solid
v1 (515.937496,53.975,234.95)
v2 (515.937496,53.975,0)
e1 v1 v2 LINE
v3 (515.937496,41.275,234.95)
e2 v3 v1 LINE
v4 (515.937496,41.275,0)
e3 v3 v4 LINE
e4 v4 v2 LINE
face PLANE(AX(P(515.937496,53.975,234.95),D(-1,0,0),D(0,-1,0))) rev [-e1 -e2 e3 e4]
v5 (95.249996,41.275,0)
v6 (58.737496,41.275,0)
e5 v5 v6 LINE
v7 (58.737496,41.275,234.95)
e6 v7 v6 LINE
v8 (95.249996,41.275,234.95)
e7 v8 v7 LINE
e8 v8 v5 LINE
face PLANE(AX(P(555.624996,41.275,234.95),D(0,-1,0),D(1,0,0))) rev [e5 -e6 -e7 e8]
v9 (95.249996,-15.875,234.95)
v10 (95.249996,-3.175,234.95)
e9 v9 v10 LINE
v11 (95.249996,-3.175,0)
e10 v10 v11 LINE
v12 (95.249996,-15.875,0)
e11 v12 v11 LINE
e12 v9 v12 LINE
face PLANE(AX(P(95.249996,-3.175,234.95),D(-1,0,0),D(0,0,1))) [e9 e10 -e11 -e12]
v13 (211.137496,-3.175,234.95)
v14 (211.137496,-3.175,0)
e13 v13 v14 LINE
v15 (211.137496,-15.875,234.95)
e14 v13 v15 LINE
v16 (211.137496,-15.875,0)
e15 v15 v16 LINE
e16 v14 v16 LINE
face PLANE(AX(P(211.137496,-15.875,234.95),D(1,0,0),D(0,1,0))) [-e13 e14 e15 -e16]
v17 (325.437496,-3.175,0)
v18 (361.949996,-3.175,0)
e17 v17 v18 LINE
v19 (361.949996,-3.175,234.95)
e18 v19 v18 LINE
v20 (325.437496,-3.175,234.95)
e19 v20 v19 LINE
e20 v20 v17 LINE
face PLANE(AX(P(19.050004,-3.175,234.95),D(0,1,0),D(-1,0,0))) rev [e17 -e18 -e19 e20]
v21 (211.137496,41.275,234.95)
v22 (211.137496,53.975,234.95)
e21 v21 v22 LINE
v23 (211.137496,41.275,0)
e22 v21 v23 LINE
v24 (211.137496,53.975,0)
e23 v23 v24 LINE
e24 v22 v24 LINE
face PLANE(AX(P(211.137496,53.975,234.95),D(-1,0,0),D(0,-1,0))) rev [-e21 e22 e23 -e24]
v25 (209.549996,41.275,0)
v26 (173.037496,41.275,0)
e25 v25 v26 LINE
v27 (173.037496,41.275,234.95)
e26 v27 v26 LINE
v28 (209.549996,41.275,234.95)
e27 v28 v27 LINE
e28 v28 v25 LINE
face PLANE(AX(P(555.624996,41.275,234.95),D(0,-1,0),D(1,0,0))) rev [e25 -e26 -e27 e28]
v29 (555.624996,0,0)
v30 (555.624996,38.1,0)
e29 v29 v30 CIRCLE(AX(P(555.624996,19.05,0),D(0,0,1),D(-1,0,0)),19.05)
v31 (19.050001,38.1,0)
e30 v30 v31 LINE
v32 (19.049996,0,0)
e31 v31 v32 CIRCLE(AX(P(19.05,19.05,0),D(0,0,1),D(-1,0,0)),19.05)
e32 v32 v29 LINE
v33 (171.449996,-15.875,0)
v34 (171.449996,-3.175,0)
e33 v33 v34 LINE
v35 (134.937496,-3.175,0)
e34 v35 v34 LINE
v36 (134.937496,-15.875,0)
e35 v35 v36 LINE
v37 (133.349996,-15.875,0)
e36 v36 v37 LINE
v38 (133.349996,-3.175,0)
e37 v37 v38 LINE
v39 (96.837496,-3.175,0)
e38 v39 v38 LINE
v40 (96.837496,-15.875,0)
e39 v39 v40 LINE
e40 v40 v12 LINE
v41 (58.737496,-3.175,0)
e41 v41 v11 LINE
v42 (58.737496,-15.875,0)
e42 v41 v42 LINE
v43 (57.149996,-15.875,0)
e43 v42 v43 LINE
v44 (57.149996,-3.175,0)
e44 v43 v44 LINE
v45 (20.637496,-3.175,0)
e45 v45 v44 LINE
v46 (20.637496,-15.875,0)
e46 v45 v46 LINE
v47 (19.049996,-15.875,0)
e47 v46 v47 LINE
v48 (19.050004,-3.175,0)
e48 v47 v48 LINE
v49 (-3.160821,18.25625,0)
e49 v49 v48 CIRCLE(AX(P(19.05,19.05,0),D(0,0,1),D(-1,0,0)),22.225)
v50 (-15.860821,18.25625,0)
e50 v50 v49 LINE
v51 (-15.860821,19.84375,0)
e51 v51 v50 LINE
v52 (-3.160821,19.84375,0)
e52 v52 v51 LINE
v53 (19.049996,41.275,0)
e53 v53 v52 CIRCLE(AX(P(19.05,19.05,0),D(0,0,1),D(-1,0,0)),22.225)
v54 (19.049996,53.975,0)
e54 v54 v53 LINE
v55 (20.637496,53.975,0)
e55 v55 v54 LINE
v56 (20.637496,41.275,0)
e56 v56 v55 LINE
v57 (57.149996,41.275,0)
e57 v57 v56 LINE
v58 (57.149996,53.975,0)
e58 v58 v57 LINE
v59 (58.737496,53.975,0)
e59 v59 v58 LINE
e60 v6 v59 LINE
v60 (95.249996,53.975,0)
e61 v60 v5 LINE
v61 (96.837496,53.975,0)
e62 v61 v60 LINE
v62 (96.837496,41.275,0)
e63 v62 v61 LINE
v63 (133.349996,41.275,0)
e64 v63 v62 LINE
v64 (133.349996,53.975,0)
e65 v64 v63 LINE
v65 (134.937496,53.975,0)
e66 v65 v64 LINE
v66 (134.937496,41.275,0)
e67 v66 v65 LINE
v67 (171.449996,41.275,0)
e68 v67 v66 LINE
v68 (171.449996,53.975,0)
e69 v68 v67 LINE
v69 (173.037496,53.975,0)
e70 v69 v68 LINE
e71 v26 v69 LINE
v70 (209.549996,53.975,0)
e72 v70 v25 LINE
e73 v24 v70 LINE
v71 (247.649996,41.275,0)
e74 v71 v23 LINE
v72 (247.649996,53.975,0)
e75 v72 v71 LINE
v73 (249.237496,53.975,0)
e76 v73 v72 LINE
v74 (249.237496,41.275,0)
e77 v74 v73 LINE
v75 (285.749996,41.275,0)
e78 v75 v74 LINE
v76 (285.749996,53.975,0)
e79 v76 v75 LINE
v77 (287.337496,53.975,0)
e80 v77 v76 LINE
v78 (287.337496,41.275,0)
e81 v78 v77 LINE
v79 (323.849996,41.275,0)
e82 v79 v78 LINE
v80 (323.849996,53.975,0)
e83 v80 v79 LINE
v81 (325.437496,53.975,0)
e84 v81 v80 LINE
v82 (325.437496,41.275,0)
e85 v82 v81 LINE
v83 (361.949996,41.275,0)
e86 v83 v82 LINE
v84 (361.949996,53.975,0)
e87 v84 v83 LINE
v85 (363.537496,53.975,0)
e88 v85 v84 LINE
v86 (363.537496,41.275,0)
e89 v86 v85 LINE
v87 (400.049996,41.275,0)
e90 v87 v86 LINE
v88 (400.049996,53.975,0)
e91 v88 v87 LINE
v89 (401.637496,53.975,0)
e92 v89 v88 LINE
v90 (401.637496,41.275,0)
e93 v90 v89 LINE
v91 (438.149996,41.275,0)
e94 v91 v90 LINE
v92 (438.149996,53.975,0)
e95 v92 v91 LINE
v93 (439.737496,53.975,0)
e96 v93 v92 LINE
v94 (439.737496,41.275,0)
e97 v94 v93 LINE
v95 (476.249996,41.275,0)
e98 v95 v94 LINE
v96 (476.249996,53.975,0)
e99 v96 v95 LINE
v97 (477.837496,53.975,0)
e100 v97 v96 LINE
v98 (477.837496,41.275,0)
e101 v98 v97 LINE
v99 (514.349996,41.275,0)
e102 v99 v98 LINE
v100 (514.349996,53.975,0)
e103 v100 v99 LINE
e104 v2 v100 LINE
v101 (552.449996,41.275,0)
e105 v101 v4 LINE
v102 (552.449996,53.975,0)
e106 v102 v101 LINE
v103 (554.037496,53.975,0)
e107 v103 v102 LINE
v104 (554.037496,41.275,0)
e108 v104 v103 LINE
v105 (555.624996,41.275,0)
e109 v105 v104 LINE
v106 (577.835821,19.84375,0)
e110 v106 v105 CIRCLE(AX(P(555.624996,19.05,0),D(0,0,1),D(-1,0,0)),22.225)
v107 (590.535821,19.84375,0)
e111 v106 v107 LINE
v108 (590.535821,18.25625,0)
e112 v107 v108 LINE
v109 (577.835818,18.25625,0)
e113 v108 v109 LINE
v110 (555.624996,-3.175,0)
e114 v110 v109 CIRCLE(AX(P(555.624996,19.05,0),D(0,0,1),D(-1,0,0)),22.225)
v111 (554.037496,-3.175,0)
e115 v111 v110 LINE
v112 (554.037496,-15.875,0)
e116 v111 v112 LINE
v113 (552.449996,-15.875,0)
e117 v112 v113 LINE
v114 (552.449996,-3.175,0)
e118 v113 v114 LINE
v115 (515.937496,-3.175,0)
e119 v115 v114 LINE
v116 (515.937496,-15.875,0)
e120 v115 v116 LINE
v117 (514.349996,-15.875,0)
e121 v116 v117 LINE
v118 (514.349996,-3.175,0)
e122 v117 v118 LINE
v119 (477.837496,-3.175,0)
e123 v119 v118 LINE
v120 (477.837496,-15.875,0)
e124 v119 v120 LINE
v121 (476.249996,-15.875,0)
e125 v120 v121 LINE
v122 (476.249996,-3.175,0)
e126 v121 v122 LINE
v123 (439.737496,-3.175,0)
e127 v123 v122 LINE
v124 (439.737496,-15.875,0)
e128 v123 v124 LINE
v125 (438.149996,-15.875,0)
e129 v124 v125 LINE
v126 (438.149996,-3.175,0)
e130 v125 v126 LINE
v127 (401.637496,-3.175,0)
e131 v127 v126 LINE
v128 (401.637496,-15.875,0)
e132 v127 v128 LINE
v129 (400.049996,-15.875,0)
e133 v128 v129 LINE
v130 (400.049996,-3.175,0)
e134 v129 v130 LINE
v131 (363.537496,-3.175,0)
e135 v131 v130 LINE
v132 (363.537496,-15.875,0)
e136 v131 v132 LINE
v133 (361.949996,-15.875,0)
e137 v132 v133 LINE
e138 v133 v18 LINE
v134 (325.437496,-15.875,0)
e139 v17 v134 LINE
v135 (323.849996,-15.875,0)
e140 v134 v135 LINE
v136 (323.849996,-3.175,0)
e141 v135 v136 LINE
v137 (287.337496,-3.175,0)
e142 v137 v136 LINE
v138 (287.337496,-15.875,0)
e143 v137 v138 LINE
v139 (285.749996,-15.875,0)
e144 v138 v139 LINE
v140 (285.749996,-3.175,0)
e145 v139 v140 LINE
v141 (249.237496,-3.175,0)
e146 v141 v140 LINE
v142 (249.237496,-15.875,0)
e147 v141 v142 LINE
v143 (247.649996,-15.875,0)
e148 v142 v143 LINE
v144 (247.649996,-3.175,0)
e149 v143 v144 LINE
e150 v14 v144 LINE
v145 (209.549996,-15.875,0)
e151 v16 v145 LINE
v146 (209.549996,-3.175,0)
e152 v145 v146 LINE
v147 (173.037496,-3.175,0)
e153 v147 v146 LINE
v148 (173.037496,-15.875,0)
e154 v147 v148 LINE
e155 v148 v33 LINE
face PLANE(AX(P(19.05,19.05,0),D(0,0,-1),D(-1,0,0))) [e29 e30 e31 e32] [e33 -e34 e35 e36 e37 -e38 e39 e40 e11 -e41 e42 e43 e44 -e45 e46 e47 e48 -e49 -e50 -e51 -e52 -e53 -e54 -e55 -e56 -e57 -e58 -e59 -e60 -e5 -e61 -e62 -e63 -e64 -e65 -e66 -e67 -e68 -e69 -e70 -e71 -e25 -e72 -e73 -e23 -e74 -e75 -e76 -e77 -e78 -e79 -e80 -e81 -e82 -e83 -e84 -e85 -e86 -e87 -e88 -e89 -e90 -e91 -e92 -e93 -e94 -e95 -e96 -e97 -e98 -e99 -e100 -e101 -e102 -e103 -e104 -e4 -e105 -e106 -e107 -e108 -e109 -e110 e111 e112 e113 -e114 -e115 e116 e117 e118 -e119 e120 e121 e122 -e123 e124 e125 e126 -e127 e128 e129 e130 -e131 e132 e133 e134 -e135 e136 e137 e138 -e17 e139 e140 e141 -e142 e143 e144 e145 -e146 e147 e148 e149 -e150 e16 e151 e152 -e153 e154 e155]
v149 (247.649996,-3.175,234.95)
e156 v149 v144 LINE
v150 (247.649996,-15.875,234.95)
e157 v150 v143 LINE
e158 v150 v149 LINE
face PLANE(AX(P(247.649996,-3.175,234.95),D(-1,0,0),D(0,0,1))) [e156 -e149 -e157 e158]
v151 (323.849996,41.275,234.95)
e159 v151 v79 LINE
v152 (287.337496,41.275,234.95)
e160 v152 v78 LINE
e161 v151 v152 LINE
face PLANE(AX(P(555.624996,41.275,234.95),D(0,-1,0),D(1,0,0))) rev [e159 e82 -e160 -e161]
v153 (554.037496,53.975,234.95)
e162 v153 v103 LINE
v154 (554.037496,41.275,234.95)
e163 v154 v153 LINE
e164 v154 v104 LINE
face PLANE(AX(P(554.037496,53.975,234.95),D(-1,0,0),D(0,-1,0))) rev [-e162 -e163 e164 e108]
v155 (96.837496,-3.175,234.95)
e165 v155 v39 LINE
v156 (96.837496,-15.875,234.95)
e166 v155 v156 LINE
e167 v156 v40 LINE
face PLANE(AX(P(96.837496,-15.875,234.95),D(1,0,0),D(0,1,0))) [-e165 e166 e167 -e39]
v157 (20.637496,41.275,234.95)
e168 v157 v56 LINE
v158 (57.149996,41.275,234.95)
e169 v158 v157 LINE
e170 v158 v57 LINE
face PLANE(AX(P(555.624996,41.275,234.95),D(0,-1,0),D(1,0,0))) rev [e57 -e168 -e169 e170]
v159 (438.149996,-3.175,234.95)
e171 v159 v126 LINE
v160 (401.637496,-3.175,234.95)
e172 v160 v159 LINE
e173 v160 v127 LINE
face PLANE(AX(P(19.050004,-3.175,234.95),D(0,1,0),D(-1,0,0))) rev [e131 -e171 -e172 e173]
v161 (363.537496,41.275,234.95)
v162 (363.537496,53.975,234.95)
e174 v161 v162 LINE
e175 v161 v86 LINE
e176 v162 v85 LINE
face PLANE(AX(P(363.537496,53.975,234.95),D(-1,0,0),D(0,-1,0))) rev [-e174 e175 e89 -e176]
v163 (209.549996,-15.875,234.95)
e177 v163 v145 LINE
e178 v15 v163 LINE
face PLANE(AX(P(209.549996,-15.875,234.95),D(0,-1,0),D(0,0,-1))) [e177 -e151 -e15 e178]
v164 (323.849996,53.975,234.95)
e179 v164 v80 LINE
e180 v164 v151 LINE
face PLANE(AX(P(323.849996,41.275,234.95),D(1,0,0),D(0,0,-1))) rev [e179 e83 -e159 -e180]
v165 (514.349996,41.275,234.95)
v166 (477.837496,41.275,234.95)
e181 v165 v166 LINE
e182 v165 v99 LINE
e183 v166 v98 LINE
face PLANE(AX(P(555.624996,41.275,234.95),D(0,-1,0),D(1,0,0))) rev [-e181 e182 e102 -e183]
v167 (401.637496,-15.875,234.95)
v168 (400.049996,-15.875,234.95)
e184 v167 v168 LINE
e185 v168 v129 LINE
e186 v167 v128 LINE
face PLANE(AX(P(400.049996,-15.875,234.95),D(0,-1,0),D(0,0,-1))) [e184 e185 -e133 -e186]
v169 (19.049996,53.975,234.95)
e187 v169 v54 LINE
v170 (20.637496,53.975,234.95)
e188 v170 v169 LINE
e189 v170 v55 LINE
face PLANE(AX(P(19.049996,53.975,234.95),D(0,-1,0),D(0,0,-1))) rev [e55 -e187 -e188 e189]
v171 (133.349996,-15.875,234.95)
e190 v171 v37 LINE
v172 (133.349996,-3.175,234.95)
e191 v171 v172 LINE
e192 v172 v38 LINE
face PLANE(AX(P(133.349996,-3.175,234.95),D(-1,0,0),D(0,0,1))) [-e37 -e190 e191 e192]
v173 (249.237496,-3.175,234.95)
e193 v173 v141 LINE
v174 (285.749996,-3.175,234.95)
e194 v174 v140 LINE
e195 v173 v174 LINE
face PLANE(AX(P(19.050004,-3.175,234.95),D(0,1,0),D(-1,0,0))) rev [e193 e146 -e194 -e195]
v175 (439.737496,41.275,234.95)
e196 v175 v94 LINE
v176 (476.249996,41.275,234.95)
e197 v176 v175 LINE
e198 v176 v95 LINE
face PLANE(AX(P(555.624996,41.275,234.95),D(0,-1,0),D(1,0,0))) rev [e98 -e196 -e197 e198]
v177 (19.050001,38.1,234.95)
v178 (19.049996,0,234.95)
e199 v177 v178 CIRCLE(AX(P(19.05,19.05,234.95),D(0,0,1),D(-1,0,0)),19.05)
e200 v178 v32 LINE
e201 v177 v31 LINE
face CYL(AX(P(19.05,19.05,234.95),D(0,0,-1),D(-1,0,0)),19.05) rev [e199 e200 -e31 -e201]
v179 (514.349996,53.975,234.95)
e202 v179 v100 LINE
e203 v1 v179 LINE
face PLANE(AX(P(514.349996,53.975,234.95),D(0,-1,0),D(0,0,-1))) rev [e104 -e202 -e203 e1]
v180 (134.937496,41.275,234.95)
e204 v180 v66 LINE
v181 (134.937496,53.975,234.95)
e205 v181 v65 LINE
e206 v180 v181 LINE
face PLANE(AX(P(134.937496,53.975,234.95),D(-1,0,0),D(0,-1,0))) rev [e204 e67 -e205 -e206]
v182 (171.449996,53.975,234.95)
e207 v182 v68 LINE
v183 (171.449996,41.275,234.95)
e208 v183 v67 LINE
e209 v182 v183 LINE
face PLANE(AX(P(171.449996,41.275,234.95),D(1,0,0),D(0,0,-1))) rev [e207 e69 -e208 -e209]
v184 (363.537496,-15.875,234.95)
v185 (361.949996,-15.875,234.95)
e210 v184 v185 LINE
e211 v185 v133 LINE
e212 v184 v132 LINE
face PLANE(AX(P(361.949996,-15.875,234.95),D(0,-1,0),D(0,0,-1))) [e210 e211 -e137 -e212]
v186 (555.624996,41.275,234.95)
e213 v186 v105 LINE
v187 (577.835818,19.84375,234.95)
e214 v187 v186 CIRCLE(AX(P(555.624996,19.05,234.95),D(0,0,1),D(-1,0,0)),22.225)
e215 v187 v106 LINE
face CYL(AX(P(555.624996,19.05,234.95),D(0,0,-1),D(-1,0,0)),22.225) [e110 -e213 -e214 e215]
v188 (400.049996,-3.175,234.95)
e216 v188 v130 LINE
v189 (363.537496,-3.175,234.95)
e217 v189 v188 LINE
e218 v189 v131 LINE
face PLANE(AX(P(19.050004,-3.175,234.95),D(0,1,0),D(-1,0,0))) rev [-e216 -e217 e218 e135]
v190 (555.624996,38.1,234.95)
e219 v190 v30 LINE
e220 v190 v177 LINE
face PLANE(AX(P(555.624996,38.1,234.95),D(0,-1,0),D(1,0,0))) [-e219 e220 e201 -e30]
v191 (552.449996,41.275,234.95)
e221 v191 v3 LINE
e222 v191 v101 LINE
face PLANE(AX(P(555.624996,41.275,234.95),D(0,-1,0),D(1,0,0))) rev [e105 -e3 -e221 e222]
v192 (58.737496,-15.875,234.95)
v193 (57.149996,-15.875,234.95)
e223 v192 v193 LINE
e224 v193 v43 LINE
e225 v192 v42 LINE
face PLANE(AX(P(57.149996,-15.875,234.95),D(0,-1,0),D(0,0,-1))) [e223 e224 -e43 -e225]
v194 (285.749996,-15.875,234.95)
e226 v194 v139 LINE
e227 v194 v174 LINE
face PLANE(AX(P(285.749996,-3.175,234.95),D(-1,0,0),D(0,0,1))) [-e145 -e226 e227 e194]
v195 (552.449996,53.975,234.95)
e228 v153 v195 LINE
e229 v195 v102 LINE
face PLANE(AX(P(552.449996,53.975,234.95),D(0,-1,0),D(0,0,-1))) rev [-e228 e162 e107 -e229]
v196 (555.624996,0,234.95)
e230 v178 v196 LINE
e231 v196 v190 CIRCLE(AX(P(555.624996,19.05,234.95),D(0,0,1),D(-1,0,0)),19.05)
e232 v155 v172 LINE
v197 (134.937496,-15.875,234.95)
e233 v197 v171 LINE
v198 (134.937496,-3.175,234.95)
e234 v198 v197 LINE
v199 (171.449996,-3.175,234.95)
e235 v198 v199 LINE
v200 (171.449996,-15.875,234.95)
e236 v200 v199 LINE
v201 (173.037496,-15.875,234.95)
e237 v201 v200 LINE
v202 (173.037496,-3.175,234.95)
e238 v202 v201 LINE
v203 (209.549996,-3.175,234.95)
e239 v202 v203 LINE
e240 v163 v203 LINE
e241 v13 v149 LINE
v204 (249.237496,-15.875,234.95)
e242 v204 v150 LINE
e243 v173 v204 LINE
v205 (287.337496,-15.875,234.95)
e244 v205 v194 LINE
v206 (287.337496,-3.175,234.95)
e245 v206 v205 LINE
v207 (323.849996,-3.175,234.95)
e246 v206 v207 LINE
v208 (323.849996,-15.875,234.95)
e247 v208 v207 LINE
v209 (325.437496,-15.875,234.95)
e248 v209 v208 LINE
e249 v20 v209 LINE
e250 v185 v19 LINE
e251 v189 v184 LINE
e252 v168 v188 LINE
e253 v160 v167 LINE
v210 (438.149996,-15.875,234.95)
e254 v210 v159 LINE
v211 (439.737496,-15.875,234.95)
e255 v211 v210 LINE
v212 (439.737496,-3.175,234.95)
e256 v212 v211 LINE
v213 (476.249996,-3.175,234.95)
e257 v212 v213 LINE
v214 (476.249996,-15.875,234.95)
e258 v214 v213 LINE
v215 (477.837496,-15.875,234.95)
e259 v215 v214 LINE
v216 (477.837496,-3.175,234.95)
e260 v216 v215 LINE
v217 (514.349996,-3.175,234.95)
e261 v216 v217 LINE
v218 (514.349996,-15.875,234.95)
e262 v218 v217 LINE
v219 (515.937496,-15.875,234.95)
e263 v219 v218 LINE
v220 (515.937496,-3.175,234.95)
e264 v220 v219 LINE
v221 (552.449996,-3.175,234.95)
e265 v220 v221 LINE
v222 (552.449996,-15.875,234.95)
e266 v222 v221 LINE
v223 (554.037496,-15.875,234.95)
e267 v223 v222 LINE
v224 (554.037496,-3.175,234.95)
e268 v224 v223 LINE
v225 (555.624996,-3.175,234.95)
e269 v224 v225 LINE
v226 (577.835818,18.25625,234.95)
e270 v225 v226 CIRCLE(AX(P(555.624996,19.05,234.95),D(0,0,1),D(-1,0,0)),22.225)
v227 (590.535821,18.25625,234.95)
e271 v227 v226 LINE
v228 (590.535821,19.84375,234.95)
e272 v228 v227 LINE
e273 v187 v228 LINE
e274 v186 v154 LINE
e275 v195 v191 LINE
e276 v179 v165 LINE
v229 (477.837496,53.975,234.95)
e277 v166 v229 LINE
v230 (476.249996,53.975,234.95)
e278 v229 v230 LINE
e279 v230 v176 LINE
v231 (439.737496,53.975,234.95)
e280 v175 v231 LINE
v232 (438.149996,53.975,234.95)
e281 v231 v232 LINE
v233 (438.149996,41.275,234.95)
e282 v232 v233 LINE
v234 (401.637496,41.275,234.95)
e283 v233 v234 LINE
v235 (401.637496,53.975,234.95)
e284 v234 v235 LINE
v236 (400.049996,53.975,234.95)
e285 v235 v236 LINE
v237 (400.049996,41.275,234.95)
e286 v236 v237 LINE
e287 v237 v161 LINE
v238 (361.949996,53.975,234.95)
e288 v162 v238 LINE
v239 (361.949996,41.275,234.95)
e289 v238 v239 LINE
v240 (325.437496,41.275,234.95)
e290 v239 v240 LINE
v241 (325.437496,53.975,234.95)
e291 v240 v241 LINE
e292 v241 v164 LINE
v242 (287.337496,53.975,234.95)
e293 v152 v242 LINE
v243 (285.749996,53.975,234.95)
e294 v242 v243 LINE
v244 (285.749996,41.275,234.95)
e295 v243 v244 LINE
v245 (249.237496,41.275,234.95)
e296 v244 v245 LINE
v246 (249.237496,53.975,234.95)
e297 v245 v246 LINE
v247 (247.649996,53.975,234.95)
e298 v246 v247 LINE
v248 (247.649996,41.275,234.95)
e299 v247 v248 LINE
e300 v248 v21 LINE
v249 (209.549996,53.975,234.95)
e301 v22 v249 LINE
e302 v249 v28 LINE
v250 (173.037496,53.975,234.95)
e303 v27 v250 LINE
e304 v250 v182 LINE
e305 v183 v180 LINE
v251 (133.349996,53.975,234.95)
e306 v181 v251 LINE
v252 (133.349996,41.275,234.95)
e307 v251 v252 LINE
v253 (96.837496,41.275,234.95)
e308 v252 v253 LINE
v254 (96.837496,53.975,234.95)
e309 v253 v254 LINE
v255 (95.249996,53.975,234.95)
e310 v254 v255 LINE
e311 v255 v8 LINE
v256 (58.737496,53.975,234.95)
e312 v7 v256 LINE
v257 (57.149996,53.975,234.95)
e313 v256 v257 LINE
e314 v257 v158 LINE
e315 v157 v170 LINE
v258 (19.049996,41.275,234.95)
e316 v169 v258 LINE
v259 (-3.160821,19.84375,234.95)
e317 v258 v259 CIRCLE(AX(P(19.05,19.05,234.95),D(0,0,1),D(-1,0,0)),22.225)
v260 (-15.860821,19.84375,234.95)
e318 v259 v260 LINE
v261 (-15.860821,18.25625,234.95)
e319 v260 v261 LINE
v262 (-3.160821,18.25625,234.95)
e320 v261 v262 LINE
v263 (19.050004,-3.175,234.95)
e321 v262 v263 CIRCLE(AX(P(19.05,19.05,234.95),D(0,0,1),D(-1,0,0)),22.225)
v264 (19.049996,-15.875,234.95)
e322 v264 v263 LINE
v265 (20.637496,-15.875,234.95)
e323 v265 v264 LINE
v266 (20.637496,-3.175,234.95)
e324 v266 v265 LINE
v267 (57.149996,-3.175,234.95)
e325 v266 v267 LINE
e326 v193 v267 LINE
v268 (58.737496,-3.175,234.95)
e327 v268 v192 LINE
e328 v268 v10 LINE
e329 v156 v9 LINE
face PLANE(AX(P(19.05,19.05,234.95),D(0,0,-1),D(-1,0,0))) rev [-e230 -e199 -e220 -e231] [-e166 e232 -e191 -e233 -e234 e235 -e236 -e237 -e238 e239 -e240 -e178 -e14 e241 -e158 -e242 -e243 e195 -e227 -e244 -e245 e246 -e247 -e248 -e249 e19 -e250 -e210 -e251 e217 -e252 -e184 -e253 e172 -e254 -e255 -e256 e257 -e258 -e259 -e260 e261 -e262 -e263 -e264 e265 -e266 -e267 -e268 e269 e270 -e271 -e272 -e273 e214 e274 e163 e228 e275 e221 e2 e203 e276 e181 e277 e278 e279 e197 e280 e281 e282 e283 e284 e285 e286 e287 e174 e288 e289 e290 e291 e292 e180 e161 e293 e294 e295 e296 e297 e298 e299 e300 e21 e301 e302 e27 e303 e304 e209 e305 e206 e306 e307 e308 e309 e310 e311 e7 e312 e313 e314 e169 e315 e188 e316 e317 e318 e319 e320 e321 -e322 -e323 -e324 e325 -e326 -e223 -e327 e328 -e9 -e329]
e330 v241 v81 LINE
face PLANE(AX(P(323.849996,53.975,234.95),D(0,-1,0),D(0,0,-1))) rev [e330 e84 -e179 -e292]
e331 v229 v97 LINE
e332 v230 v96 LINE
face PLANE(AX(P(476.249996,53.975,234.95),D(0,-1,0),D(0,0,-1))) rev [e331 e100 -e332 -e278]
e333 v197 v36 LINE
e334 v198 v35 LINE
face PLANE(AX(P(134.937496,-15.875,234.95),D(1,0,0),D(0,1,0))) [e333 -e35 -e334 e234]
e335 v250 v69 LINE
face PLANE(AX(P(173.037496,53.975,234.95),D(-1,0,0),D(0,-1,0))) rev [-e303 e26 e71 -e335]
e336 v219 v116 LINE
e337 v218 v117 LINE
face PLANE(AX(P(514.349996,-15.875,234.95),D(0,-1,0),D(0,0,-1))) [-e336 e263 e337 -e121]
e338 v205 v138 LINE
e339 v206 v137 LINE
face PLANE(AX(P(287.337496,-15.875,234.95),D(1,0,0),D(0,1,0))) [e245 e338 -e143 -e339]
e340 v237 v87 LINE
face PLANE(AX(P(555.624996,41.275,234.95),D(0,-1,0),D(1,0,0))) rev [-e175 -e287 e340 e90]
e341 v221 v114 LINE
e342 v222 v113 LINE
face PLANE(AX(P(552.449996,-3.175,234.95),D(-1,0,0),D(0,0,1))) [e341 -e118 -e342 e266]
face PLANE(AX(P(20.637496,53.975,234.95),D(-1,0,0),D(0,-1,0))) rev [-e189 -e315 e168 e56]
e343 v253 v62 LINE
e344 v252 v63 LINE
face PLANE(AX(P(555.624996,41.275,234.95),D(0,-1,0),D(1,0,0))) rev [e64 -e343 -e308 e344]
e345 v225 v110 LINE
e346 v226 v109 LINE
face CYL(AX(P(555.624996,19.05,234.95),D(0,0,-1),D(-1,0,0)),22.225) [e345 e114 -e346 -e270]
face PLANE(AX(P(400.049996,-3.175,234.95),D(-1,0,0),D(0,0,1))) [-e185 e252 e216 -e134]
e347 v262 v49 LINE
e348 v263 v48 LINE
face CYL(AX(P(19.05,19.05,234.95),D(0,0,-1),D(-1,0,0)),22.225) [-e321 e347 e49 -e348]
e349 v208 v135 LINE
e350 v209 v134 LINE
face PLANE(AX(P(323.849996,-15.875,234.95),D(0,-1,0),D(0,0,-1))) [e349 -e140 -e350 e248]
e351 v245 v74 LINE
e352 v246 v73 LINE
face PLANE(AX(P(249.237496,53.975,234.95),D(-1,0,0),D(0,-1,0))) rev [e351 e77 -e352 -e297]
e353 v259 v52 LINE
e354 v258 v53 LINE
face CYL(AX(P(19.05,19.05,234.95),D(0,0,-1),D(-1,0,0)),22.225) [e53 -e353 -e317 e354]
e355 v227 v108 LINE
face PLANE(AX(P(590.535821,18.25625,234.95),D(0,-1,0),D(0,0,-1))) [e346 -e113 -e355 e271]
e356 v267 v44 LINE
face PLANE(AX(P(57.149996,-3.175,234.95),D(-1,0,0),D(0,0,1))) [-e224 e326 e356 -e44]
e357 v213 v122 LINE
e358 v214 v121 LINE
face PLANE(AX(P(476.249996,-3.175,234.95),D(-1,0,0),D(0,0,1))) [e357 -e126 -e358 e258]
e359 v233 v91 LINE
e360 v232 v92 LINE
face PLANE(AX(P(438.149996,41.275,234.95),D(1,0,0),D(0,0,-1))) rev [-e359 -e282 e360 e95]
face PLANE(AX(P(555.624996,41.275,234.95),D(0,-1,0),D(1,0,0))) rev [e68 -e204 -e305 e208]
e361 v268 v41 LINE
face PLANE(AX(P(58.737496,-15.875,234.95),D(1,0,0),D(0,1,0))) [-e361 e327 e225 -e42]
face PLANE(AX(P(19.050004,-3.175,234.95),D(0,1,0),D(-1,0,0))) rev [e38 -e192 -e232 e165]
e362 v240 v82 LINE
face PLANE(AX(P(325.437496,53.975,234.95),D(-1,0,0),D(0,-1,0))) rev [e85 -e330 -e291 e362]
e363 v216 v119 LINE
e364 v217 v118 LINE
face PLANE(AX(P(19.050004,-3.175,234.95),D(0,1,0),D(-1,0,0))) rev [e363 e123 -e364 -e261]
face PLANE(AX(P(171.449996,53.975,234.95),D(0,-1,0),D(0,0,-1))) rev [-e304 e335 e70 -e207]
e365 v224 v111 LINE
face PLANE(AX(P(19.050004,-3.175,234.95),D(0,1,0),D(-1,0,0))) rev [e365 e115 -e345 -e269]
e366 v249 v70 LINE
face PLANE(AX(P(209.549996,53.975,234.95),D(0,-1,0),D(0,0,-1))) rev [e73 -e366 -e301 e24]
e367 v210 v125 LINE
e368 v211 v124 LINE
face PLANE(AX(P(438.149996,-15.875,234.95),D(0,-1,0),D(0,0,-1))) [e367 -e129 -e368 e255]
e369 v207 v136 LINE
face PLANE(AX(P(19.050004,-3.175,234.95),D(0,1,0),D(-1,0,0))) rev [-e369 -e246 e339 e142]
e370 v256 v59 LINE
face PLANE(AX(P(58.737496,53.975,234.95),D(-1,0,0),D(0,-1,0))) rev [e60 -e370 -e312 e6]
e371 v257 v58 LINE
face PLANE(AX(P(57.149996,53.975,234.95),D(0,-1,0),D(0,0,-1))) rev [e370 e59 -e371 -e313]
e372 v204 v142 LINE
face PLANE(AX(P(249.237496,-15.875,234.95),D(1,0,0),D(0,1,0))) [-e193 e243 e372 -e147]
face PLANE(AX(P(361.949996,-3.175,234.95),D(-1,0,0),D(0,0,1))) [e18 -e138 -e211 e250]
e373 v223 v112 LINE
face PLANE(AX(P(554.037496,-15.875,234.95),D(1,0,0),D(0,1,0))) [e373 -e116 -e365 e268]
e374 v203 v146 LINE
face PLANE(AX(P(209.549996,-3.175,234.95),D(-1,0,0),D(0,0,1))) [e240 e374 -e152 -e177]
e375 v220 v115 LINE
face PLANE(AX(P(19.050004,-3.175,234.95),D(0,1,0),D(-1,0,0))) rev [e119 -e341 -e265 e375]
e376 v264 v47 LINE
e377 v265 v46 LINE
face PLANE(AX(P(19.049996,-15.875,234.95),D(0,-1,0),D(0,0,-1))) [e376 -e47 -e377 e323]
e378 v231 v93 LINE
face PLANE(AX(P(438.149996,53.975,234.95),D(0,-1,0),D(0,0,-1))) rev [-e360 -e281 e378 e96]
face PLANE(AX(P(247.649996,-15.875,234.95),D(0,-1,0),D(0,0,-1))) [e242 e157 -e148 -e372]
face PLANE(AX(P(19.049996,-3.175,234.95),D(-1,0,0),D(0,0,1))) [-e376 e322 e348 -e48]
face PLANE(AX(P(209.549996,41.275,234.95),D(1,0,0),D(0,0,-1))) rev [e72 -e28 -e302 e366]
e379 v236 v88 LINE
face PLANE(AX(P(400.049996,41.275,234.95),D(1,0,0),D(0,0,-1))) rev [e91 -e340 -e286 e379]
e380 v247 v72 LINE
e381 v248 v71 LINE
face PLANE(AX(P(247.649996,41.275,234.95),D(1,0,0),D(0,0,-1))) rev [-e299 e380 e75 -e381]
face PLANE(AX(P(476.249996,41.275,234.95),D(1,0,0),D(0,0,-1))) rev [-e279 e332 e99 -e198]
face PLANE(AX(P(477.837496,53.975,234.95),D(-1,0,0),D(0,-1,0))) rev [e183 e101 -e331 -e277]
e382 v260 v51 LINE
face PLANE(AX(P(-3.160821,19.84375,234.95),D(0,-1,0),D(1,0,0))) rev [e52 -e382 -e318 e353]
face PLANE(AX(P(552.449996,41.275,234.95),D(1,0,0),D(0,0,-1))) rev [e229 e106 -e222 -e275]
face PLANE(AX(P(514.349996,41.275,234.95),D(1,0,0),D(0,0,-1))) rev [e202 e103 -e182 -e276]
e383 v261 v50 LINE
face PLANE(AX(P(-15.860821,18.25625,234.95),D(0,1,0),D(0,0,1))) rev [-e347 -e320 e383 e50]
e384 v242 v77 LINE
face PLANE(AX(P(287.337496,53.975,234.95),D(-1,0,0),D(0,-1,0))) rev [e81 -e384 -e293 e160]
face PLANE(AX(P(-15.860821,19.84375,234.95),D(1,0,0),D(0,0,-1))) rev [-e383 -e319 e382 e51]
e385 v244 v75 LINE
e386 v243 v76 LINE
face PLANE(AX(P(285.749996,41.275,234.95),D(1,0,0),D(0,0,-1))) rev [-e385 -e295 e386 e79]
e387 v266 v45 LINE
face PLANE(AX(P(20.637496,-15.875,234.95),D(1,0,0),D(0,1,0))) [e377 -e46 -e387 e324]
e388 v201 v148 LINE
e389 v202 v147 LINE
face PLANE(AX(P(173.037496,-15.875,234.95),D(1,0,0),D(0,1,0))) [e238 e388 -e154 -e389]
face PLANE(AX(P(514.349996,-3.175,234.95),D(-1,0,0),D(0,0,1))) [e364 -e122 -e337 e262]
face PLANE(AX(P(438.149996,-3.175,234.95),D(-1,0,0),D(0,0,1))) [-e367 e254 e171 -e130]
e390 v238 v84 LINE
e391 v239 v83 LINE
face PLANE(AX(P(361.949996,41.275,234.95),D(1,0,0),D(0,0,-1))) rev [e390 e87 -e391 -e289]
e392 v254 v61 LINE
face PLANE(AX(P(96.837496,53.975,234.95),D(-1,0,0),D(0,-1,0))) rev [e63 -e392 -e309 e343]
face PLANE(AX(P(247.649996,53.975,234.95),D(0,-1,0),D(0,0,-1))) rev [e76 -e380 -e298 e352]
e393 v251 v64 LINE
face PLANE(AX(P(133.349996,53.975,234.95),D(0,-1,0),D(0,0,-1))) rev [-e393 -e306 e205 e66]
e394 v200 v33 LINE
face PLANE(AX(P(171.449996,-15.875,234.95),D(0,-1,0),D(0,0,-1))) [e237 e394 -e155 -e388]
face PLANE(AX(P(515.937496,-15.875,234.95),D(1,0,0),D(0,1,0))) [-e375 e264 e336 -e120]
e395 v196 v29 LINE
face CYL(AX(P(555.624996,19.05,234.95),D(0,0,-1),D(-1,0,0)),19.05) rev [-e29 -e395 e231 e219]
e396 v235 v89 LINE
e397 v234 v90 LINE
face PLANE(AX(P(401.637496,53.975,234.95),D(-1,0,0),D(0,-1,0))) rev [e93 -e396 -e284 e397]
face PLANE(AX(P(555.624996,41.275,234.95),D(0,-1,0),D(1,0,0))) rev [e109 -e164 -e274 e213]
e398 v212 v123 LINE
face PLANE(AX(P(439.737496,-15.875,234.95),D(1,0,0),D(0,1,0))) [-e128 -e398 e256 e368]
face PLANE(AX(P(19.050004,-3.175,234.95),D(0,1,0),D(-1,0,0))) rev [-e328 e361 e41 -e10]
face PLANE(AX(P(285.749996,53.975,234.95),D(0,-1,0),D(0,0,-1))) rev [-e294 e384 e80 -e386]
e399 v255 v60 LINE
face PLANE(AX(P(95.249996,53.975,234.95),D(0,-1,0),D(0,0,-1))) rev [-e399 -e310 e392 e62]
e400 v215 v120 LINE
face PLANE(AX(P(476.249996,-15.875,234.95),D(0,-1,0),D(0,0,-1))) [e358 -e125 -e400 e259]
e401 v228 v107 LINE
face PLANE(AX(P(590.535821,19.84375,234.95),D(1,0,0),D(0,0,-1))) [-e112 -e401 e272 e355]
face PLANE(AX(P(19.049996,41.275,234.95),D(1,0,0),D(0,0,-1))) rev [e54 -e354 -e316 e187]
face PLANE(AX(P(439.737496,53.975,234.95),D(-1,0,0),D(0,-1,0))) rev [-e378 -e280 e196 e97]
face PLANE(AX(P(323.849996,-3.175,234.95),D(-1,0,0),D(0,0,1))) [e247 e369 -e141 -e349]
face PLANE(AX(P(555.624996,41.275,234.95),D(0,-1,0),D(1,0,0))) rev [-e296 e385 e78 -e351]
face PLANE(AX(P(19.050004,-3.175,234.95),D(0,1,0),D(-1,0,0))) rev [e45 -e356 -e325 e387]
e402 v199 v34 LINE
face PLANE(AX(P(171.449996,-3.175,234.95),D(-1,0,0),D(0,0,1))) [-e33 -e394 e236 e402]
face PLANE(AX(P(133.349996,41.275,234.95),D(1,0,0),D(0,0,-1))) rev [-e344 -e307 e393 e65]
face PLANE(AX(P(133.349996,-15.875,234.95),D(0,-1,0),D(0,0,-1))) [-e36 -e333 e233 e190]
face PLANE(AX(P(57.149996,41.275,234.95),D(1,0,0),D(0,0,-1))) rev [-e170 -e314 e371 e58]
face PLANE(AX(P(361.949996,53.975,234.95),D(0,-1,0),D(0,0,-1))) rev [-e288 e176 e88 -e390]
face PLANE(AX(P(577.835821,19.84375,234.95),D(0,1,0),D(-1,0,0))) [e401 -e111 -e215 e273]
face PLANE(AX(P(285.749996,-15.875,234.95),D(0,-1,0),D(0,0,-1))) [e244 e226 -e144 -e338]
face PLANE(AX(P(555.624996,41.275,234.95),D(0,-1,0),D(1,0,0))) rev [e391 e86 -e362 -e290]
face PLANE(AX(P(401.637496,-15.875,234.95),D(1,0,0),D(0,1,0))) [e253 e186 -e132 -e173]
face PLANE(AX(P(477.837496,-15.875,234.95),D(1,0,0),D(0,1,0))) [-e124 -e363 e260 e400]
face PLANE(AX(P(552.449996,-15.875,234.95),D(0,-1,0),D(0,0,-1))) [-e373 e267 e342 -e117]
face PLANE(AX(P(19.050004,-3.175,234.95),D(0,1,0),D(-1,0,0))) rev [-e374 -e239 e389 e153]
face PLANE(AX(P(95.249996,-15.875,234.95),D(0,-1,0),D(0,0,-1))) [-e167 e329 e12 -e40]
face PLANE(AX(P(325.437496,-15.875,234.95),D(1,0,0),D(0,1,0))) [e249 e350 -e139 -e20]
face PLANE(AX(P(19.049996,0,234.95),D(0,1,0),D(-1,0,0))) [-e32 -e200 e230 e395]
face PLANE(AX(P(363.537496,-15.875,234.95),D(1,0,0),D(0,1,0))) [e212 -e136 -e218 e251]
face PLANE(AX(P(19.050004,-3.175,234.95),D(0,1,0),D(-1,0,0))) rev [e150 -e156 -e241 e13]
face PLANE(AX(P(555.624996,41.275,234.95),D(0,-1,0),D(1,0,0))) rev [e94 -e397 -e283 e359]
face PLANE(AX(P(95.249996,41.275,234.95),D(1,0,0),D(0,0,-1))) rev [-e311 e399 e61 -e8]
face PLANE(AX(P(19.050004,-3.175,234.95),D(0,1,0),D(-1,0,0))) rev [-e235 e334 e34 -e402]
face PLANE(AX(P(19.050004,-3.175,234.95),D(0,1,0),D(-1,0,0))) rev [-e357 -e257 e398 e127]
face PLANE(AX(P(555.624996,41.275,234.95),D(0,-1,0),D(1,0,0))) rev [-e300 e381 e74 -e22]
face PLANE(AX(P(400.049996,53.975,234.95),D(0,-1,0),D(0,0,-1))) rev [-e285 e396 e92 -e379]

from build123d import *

# Parameters (mm, degrees)
BOSS_EXTRUDE1_DEPTH      = 234.95
SKETCH3_W                = 1.5875
SKETCH3_H                = 12.7
BOSS_EXTRUDE3_DEPTH      = 234.95
LPATTERN1_COUNT          = 15
LPATTERN1_PITCH          = 38.1
MIRROR1_COPY_1_SKETCH_W  = 1.5875
MIRROR1_COPY_1_SKETCH_H  = 12.7
MIRROR1_COPY_1_DEPTH     = 234.95
MIRROR1_COPY_2_SKETCH_W  = 1.5875
MIRROR1_COPY_2_SKETCH_H  = 12.7
MIRROR1_COPY_2_DEPTH     = 234.95
MIRROR1_COPY_3_SKETCH_W  = 1.5875
MIRROR1_COPY_3_SKETCH_H  = 12.7
MIRROR1_COPY_3_DEPTH     = 234.95
MIRROR1_COPY_4_SKETCH_W  = 1.5875
MIRROR1_COPY_4_SKETCH_H  = 12.7
MIRROR1_COPY_4_DEPTH     = 234.95
MIRROR1_COPY_5_SKETCH_W  = 1.5875
MIRROR1_COPY_5_SKETCH_H  = 12.7
MIRROR1_COPY_5_DEPTH     = 234.95
MIRROR1_COPY_6_SKETCH_W  = 1.5875
MIRROR1_COPY_6_SKETCH_H  = 12.7
MIRROR1_COPY_6_DEPTH     = 234.95
MIRROR1_COPY_7_SKETCH_W  = 1.5875
MIRROR1_COPY_7_SKETCH_H  = 12.7
MIRROR1_COPY_7_DEPTH     = 234.95
MIRROR1_COPY_8_SKETCH_W  = 1.5875
MIRROR1_COPY_8_SKETCH_H  = 12.7
MIRROR1_COPY_8_DEPTH     = 234.95
MIRROR1_COPY_9_SKETCH_W  = 1.5875
MIRROR1_COPY_9_SKETCH_H  = 12.7
MIRROR1_COPY_9_DEPTH     = 234.95
MIRROR1_COPY_10_SKETCH_W = 1.5875
MIRROR1_COPY_10_SKETCH_H = 12.7
MIRROR1_COPY_10_DEPTH    = 234.95
MIRROR1_COPY_11_SKETCH_W = 1.5875
MIRROR1_COPY_11_SKETCH_H = 12.7
MIRROR1_COPY_11_DEPTH    = 234.95
MIRROR1_COPY_12_SKETCH_W = 1.5875
MIRROR1_COPY_12_SKETCH_H = 12.7
MIRROR1_COPY_12_DEPTH    = 234.95
MIRROR1_COPY_13_SKETCH_W = 1.5875
MIRROR1_COPY_13_SKETCH_H = 12.7
MIRROR1_COPY_13_DEPTH    = 234.95
MIRROR1_COPY_14_SKETCH_W = 1.5875
MIRROR1_COPY_14_SKETCH_H = 12.7
MIRROR1_COPY_14_DEPTH    = 234.95
BOSS_EXTRUDE4_DEPTH      = 234.95
MIRROR2_START            = 577.835817532
MIRROR2_OUTLINE_W        = 1.5875
MIRROR2_OUTLINE_H        = 234.95
MIRROR2_DEPTH            = 12.700003838


# Read off the part's stored shape, not the designer's step: Mirror2
with BuildPart() as part:
    # Sketch1 → Boss-Extrude1 (new body)
    with BuildSketch(Plane.XY):
        with BuildLine():
            Line((19.050003843, -3.175), (555.624996157, -3.175))
            ThreePointArc((555.624996157, -3.175), (577.849996157, 19.05), (555.624996157, 41.275))
            Line((555.624996157, 41.275), (19.049996157, 41.275))
            ThreePointArc((19.049996157, 41.275), (-3.175, 19.049996157), (19.050003843, -3.175))
        make_face()
        with BuildLine():
            Line((19.049996157, 0), (555.624996157, 0))
            ThreePointArc((555.624996157, 0), (574.674996157, 19.05), (555.624996157, 38.1))
            Line((555.624996157, 38.1), (19.050000909, 38.1))
            ThreePointArc((19.050000909, 38.1), (0, 19.050002376), (19.049996157, 0))
        make_face(mode=Mode.SUBTRACT)
    extrude(amount=BOSS_EXTRUDE1_DEPTH)

    # Sketch3 → Boss-Extrude3 (add)
    with BuildSketch(Plane.XY):
        with Locations((19.843746157, 47.625)):
            Rectangle(SKETCH3_W, SKETCH3_H)
    boss_extrude3 = extrude(amount=BOSS_EXTRUDE3_DEPTH)

    # LPattern1: Boss-Extrude3 ×15
    with Locations(*[(i * LPATTERN1_PITCH, 0, 0) for i in range(1, LPATTERN1_COUNT)]):
        add(boss_extrude3)

    # Mirror1: Boss-Extrude3 across plane
    add(boss_extrude3.mirror(Plane.ZX.offset(19.05)))

    # Mirror1 copy 1 sketch → Mirror1 copy 1 (add)
    with BuildSketch(Plane(origin=(38.1, 38.1, 0), x_dir=(1, 0, 0), z_dir=(0, 0, 1))):
        with Locations((19.843746157, -47.625)):
            Rectangle(MIRROR1_COPY_1_SKETCH_W, MIRROR1_COPY_1_SKETCH_H)
    extrude(amount=MIRROR1_COPY_1_DEPTH)

    # Mirror1 copy 2 sketch → Mirror1 copy 2 (add)
    with BuildSketch(Plane(origin=(76.2, 38.1, 0), x_dir=(1, 0, 0), z_dir=(0, 0, 1))):
        with Locations((19.843746157, -47.625)):
            Rectangle(MIRROR1_COPY_2_SKETCH_W, MIRROR1_COPY_2_SKETCH_H)
    extrude(amount=MIRROR1_COPY_2_DEPTH)

    # Mirror1 copy 3 sketch → Mirror1 copy 3 (add)
    with BuildSketch(Plane(origin=(114.3, 38.1, 0), x_dir=(1, 0, 0), z_dir=(0, 0, 1))):
        with Locations((19.843746157, -47.625)):
            Rectangle(MIRROR1_COPY_3_SKETCH_W, MIRROR1_COPY_3_SKETCH_H)
    extrude(amount=MIRROR1_COPY_3_DEPTH)

    # Mirror1 copy 4 sketch → Mirror1 copy 4 (add)
    with BuildSketch(Plane(origin=(152.4, 38.1, 0), x_dir=(1, 0, 0), z_dir=(0, 0, 1))):
        with Locations((19.843746157, -47.625)):
            Rectangle(MIRROR1_COPY_4_SKETCH_W, MIRROR1_COPY_4_SKETCH_H)
    extrude(amount=MIRROR1_COPY_4_DEPTH)

    # Mirror1 copy 5 sketch → Mirror1 copy 5 (add)
    with BuildSketch(Plane(origin=(190.5, 38.1, 0), x_dir=(1, 0, 0), z_dir=(0, 0, 1))):
        with Locations((19.843746157, -47.625)):
            Rectangle(MIRROR1_COPY_5_SKETCH_W, MIRROR1_COPY_5_SKETCH_H)
    extrude(amount=MIRROR1_COPY_5_DEPTH)

    # Mirror1 copy 6 sketch → Mirror1 copy 6 (add)
    with BuildSketch(Plane(origin=(228.6, 38.1, 0), x_dir=(1, 0, 0), z_dir=(0, 0, 1))):
        with Locations((19.843746157, -47.625)):
            Rectangle(MIRROR1_COPY_6_SKETCH_W, MIRROR1_COPY_6_SKETCH_H)
    extrude(amount=MIRROR1_COPY_6_DEPTH)

    # Mirror1 copy 7 sketch → Mirror1 copy 7 (add)
    with BuildSketch(Plane(origin=(266.7, 38.1, 0), x_dir=(1, 0, 0), z_dir=(0, 0, 1))):
        with Locations((19.843746157, -47.625)):
            Rectangle(MIRROR1_COPY_7_SKETCH_W, MIRROR1_COPY_7_SKETCH_H)
    extrude(amount=MIRROR1_COPY_7_DEPTH)

    # Mirror1 copy 8 sketch → Mirror1 copy 8 (add)
    with BuildSketch(Plane(origin=(304.8, 38.1, 0), x_dir=(1, 0, 0), z_dir=(0, 0, 1))):
        with Locations((19.843746157, -47.625)):
            Rectangle(MIRROR1_COPY_8_SKETCH_W, MIRROR1_COPY_8_SKETCH_H)
    extrude(amount=MIRROR1_COPY_8_DEPTH)

    # Mirror1 copy 9 sketch → Mirror1 copy 9 (add)
    with BuildSketch(Plane(origin=(342.9, 38.1, 0), x_dir=(1, 0, 0), z_dir=(0, 0, 1))):
        with Locations((19.843746157, -47.625)):
            Rectangle(MIRROR1_COPY_9_SKETCH_W, MIRROR1_COPY_9_SKETCH_H)
    extrude(amount=MIRROR1_COPY_9_DEPTH)

    # Mirror1 copy 10 sketch → Mirror1 copy 10 (add)
    with BuildSketch(Plane(origin=(381, 38.1, 0), x_dir=(1, 0, 0), z_dir=(0, 0, 1))):
        with Locations((19.843746157, -47.625)):
            Rectangle(MIRROR1_COPY_10_SKETCH_W, MIRROR1_COPY_10_SKETCH_H)
    extrude(amount=MIRROR1_COPY_10_DEPTH)

    # Mirror1 copy 11 sketch → Mirror1 copy 11 (add)
    with BuildSketch(Plane(origin=(419.1, 38.1, 0), x_dir=(1, 0, 0), z_dir=(0, 0, 1))):
        with Locations((19.843746157, -47.625)):
            Rectangle(MIRROR1_COPY_11_SKETCH_W, MIRROR1_COPY_11_SKETCH_H)
    extrude(amount=MIRROR1_COPY_11_DEPTH)

    # Mirror1 copy 12 sketch → Mirror1 copy 12 (add)
    with BuildSketch(Plane(origin=(457.2, 38.1, 0), x_dir=(1, 0, 0), z_dir=(0, 0, 1))):
        with Locations((19.843746157, -47.625)):
            Rectangle(MIRROR1_COPY_12_SKETCH_W, MIRROR1_COPY_12_SKETCH_H)
    extrude(amount=MIRROR1_COPY_12_DEPTH)

    # Mirror1 copy 13 sketch → Mirror1 copy 13 (add)
    with BuildSketch(Plane(origin=(495.3, 38.1, 0), x_dir=(1, 0, 0), z_dir=(0, 0, 1))):
        with Locations((19.843746157, -47.625)):
            Rectangle(MIRROR1_COPY_13_SKETCH_W, MIRROR1_COPY_13_SKETCH_H)
    extrude(amount=MIRROR1_COPY_13_DEPTH)

    # Mirror1 copy 14 sketch → Mirror1 copy 14 (add)
    with BuildSketch(Plane(origin=(533.4, 38.1, 0), x_dir=(1, 0, 0), z_dir=(0, 0, 1))):
        with Locations((19.843746157, -47.625)):
            Rectangle(MIRROR1_COPY_14_SKETCH_W, MIRROR1_COPY_14_SKETCH_H)
    extrude(amount=MIRROR1_COPY_14_DEPTH)

    # Sketch4 → Boss-Extrude4 (add)
    with BuildSketch(Plane.XY):
        with BuildLine():
            Line((-3.16082137, 19.84375), (-15.86082137, 19.84375))
            Line((-15.86082137, 19.84375), (-15.86082137, 18.25625))
            Line((-15.86082137, 18.25625), (-3.16082137, 18.25625))
            ThreePointArc((-3.16082137, 18.25625), (-3.175, 19.05), (-3.16082137, 19.84375))
        make_face()
    extrude(amount=BOSS_EXTRUDE4_DEPTH)

    # Mirror2 outline → Mirror2 (add)
    with BuildSketch(Plane.YZ.offset(MIRROR2_START)):
        with Locations((19.05, 117.475)):
            Rectangle(MIRROR2_OUTLINE_W, MIRROR2_OUTLINE_H)
    extrude(amount=MIRROR2_DEPTH)


solid = part.part
